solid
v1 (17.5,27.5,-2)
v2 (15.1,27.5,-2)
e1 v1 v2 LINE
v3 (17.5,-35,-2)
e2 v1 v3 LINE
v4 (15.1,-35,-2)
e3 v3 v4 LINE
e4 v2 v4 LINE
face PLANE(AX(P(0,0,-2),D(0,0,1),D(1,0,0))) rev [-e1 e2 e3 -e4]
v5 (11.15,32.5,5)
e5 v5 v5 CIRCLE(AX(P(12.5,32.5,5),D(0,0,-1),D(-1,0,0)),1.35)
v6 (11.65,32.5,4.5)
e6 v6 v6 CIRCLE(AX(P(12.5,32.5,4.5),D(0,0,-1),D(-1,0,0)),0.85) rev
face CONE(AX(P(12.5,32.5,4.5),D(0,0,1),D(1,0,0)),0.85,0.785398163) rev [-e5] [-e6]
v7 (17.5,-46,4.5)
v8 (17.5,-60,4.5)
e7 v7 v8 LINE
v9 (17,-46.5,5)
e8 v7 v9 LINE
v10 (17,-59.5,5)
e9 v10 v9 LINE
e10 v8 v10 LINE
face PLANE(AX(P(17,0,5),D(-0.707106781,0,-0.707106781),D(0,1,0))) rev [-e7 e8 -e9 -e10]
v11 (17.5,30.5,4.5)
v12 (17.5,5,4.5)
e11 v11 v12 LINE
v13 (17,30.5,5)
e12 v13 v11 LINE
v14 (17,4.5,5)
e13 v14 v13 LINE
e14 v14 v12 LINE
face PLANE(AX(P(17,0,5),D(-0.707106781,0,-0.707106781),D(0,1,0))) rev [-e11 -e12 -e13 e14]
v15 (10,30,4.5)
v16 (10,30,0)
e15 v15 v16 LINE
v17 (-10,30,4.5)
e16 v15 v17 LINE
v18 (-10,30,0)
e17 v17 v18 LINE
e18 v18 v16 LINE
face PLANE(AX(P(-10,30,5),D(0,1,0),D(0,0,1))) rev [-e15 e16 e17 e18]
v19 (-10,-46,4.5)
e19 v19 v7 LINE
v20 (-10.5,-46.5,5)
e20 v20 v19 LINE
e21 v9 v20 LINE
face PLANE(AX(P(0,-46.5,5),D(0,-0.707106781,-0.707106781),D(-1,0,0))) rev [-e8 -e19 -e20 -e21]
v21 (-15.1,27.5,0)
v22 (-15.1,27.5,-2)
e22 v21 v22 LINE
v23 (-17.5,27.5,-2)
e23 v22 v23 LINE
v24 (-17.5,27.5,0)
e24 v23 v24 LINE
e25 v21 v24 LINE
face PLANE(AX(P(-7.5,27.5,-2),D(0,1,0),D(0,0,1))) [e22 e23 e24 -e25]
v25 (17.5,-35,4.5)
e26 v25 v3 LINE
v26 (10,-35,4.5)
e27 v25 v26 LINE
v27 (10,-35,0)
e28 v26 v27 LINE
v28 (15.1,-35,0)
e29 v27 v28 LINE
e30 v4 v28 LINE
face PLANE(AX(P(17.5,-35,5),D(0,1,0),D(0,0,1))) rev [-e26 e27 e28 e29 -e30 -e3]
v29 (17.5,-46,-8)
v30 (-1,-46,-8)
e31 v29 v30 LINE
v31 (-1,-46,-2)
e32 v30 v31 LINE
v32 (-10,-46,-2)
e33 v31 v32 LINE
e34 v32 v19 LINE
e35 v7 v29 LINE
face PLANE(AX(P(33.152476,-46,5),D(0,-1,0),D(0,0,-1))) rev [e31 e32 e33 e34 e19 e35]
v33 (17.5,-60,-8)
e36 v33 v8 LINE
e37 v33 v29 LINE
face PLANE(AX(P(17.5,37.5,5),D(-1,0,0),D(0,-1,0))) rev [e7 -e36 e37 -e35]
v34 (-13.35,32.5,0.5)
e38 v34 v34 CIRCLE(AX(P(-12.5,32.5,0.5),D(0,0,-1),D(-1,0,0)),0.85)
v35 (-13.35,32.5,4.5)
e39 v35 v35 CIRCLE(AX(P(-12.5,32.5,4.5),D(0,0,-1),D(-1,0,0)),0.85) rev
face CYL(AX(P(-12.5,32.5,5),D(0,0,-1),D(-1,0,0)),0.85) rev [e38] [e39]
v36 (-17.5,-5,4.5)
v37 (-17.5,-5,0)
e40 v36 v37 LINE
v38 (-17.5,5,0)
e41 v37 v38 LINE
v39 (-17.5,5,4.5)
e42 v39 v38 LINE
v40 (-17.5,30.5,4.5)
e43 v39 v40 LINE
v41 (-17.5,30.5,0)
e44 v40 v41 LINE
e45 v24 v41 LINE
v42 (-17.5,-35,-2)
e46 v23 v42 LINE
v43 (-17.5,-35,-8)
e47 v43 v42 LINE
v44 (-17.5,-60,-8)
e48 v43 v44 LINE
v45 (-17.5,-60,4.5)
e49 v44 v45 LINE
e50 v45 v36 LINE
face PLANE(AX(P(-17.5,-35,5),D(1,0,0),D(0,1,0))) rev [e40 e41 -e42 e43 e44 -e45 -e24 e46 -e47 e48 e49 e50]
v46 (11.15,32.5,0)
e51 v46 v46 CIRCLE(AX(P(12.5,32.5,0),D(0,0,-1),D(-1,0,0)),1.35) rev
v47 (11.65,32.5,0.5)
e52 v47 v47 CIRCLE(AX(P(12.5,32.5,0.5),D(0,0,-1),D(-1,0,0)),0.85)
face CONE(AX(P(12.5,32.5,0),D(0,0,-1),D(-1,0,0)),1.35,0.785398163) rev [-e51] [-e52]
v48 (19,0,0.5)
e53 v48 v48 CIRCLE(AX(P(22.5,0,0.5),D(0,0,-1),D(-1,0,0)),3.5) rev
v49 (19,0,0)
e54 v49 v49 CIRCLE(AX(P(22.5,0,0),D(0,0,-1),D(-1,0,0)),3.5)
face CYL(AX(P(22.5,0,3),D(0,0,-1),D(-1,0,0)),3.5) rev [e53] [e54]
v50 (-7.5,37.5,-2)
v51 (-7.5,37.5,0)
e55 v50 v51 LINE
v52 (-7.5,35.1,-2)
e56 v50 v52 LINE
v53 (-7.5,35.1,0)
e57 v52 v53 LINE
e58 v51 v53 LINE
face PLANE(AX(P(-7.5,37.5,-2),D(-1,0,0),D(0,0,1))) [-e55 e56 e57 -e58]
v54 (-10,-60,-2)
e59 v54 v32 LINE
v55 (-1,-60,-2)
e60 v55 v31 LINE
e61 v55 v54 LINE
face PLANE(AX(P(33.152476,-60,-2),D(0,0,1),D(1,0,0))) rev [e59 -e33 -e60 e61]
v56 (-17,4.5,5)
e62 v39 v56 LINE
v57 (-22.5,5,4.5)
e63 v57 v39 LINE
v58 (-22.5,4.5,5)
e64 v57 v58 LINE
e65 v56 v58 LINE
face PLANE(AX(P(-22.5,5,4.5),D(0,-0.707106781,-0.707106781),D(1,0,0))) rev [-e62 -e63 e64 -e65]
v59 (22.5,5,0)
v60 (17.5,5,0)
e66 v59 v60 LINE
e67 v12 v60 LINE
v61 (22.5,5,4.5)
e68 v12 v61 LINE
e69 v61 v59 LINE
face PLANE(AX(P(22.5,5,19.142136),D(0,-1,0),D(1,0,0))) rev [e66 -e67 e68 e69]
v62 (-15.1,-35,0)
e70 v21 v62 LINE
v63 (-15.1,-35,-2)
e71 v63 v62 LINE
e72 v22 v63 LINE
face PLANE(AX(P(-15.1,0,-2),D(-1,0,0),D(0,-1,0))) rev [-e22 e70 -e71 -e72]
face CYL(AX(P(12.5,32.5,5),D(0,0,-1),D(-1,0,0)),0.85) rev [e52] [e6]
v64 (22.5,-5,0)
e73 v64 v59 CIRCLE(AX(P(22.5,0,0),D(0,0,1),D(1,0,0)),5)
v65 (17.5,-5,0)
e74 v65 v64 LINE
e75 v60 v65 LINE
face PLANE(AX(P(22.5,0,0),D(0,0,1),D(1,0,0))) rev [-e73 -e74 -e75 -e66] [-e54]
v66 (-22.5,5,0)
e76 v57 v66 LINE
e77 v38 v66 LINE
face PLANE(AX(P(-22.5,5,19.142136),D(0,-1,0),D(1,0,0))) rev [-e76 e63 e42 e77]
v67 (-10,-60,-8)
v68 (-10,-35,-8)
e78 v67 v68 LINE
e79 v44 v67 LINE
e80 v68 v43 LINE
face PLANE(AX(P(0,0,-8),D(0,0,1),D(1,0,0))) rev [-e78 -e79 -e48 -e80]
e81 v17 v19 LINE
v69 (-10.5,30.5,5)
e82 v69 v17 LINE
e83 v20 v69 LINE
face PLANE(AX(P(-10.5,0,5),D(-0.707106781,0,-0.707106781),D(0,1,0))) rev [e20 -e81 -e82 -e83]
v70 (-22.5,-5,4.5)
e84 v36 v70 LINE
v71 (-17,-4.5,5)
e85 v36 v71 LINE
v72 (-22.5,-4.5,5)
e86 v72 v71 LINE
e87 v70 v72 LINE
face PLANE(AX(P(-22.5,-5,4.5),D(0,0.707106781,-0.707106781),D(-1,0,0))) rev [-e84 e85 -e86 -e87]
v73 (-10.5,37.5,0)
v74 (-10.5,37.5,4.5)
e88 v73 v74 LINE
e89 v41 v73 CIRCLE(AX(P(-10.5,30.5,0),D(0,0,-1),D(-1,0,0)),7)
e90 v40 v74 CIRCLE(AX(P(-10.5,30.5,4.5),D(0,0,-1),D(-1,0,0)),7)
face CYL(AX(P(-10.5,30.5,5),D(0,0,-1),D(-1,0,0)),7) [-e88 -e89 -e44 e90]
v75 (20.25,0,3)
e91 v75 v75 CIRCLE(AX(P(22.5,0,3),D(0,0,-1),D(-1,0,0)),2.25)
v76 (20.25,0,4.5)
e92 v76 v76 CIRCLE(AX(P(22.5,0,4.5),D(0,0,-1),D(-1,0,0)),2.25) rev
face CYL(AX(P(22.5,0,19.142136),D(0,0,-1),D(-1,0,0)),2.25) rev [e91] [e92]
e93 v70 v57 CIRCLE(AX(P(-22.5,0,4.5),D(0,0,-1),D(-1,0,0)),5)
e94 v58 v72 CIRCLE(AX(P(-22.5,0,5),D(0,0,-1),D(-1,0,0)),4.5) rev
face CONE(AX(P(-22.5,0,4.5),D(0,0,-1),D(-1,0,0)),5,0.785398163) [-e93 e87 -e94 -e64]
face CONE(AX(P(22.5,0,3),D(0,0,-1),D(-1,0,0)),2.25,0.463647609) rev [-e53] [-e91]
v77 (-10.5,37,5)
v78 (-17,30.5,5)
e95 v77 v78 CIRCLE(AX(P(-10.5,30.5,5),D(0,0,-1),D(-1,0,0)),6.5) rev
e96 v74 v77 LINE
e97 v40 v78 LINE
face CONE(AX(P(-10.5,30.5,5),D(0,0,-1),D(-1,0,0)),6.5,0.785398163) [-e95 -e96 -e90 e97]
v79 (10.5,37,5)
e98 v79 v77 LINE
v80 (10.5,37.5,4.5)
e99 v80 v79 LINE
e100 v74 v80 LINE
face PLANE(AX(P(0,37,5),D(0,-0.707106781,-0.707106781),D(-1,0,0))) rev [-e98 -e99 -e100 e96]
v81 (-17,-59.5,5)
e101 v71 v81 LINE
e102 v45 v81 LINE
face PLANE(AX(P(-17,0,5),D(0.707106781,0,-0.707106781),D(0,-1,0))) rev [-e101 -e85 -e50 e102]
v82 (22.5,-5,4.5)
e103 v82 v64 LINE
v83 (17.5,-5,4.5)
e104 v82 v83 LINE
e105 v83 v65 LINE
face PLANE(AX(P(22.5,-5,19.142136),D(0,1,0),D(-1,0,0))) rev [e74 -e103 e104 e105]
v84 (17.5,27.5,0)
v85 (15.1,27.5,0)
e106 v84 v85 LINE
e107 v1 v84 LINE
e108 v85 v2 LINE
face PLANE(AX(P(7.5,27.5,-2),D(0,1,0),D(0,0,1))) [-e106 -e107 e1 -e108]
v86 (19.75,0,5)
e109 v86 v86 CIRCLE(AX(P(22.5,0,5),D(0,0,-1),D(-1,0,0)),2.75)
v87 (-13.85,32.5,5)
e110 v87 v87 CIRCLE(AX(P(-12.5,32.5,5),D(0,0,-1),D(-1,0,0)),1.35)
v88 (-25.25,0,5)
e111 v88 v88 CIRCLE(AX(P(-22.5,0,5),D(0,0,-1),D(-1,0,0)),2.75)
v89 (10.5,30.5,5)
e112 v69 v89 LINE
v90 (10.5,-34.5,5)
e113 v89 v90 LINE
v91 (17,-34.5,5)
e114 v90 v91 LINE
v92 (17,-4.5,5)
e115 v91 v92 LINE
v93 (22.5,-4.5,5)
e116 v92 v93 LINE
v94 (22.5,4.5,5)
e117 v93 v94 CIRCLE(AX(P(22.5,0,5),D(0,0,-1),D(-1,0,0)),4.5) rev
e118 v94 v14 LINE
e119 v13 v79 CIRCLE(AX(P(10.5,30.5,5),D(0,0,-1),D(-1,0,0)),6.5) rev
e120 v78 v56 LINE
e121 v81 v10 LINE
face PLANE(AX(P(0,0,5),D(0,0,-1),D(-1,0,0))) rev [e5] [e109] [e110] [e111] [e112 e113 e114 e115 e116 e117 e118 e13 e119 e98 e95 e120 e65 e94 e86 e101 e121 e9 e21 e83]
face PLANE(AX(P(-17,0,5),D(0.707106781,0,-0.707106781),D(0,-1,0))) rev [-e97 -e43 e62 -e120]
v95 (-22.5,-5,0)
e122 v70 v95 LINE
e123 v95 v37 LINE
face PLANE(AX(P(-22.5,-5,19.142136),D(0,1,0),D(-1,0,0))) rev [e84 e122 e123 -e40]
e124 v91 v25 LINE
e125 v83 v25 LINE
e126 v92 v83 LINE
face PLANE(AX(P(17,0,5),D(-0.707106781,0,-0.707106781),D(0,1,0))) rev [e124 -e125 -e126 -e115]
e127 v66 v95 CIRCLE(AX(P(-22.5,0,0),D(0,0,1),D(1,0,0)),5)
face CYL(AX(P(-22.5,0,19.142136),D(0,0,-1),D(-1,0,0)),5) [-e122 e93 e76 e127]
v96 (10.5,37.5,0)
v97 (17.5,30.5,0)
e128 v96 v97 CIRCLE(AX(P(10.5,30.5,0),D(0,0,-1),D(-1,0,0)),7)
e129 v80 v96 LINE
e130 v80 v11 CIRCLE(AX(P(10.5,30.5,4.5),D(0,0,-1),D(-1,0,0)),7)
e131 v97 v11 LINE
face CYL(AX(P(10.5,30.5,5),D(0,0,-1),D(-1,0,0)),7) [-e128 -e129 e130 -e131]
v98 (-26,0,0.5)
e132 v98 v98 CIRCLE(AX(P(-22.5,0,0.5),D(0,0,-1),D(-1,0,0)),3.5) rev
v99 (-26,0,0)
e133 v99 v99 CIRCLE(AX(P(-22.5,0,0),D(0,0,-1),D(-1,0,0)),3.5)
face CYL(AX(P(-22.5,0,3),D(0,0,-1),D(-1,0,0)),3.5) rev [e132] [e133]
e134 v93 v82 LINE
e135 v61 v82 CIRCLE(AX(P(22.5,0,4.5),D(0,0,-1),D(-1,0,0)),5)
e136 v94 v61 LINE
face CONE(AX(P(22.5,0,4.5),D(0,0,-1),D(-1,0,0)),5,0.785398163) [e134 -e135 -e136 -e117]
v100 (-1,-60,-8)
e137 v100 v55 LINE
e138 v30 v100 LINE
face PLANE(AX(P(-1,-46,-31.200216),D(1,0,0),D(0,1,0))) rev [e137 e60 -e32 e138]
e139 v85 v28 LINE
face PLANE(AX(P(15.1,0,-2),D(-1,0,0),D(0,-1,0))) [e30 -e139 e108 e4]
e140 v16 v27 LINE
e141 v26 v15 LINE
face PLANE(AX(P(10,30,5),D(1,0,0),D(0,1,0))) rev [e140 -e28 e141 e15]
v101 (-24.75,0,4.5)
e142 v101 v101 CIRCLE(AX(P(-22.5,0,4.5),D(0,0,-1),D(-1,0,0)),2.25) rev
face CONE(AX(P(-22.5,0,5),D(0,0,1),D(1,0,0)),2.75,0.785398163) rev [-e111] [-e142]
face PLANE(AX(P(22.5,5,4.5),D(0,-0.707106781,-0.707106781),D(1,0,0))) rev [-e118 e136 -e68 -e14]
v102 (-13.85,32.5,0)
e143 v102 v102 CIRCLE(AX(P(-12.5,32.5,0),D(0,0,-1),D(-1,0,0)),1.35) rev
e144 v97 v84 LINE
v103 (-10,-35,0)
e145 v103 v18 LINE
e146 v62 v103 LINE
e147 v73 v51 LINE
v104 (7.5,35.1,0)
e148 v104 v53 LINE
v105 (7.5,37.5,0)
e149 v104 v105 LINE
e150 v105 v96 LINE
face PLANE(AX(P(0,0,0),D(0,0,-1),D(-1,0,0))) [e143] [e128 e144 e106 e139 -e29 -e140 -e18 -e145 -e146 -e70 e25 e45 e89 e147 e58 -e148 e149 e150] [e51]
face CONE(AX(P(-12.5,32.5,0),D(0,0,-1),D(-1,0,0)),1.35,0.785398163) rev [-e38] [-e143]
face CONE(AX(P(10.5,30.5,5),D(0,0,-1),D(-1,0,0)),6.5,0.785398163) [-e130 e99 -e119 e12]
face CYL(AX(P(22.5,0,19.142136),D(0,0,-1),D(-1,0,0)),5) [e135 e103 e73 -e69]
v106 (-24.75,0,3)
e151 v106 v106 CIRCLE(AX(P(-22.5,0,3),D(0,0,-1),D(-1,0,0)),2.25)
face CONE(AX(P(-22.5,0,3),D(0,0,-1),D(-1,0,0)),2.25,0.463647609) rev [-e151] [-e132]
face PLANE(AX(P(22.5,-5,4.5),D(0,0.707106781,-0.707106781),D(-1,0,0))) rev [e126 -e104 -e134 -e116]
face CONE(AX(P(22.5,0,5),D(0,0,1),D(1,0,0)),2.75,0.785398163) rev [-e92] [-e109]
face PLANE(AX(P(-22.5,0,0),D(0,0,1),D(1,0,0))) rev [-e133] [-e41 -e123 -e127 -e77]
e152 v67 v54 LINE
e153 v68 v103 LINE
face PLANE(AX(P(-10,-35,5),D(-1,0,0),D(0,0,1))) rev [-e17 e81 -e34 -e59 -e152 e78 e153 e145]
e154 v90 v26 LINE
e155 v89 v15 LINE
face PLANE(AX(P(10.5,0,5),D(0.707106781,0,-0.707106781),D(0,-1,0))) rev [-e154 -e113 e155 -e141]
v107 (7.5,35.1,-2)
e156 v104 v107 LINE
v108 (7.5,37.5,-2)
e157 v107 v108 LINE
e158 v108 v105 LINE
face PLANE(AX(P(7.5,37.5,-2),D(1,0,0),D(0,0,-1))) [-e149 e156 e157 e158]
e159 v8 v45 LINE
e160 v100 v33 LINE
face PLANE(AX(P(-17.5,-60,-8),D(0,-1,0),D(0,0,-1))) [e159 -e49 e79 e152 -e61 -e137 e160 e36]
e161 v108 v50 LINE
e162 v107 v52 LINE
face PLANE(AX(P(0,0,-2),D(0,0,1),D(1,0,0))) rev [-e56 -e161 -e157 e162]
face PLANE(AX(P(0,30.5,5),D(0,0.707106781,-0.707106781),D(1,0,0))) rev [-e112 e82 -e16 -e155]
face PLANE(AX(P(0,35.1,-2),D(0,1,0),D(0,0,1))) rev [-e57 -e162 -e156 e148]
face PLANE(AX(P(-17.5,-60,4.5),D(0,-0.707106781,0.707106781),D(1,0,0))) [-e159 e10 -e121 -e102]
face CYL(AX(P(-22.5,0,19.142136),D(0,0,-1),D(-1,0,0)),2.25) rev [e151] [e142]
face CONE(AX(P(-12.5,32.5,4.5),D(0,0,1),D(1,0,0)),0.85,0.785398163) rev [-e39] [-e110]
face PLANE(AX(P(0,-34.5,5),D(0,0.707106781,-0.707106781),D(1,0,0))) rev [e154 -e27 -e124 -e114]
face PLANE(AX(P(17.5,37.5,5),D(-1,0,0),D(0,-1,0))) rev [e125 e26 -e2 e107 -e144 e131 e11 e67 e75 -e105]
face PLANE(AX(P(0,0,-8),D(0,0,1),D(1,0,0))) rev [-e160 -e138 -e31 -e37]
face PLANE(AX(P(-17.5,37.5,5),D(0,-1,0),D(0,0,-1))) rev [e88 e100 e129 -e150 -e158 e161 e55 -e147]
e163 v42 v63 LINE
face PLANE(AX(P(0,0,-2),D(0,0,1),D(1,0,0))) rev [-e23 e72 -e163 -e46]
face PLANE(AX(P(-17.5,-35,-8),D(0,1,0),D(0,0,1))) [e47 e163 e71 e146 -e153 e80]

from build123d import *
from OCP.BRepFilletAPI import BRepFilletAPI_MakeChamfer

# Parameters (mm, degrees)
SKETCH1_R                = 0.85
BOSS_EXTRUDE1_DEPTH      = 5
BOSS_EXTRUDE2_DEPTH      = 2
SKETCH3_R                = 2.25
BOSS_EXTRUDE3_DEPTH      = 5
SKETCH4_R                = 3.5
CUT_EXTRUDE1_DEPTH       = 3
SKETCH5_W                = 10
SKETCH5_H                = 10
CUT_EXTRUDE2_DEPTH       = 47.770717335
FILLET1_R                = 7
BOSS_EXTRUDE4_DEPTH      = 5
BOSS_EXTRUDE4_DEPTH_BACK = 8
SKETCH6_W                = 7.5
SKETCH6_H                = 25
SKETCH7_W                = 7
SKETCH7_H                = 14
BOSS_EXTRUDE5_DEPTH      = 27.5
SKETCH8_W                = 18.5
SKETCH8_H                = 14
BOSS_EXTRUDE6_DEPTH      = 6
CHAMFER3_SIZE            = 0.5
CHAMFER1_SIZE            = 2.5
CHAMFER1_SIZE_2          = 1.25


with BuildPart() as part:
    # Sketch1 → Boss-Extrude1 (new body)
    with BuildSketch(Plane.XY):
        Polygon((-10, -35), (-10, 30), (10, 30), (10, -35), (17.5, -35), (17.5, 37.5), (-17.5, 37.5), (-17.5, -35), align=None)
        with Locations((-12.5, 32.5)):
            Circle(SKETCH1_R, mode=Mode.SUBTRACT)
        with Locations((12.5, 32.5)):
            Circle(SKETCH1_R, mode=Mode.SUBTRACT)
    extrude(amount=BOSS_EXTRUDE1_DEPTH)

    # Sketch2 → Boss-Extrude2 (add)
    with BuildSketch(Plane.XY):
        Polygon((17.5, -35), (17.5, 37.5), (-17.5, 37.5), (-17.5, -35), (-15.1, -35), (-15.1, 35.1), (15.1, 35.1), (15.1, -35), align=None)
    extrude(amount=-BOSS_EXTRUDE2_DEPTH)

    # Sketch3 → Boss-Extrude3 (add)
    # profile 1 of 2: a face of its own
    with BuildSketch(Plane.XY):
        with BuildLine():
            Line((22.5, 5), (17.5, 5))
            Line((17.5, 5), (17.5, -5))
            Line((17.5, -5), (22.5, -5))
            ThreePointArc((22.5, -5), (27.5, 0), (22.5, 5))
        make_face()
        with Locations(Location((22.5, 0, 0), (0, 0, 180))):
            Circle(SKETCH3_R, mode=Mode.SUBTRACT)
    # profile 2 of 2: a face of its own
    with BuildSketch(Plane.XY):
        with BuildLine():
            Line((-22.5, 5), (-17.5, 5))
            Line((-17.5, 5), (-17.5, -5))
            Line((-17.5, -5), (-22.5, -5))
            ThreePointArc((-22.5, -5), (-27.5, 0), (-22.5, 5))
        make_face()
        with Locations(Location((-22.5, 0, 0), (0, 0, 180))):
            Circle(SKETCH3_R, mode=Mode.SUBTRACT)
    extrude(amount=BOSS_EXTRUDE3_DEPTH)

    # Sketch4 → Cut-Extrude1 (cut)
    with BuildSketch(Plane(origin=(0, 0, 0), x_dir=(-1, 0, 0), z_dir=(0, 0, -1))):
        with Locations((-22.5, 0)):
            Circle(SKETCH4_R)
        with Locations((22.5, 0)):
            Circle(SKETCH4_R)
    extrude(amount=-CUT_EXTRUDE1_DEPTH, mode=Mode.SUBTRACT)

    # Sketch5 → Cut-Extrude2 (cut, through all)
    with BuildSketch(Plane(origin=(0, 0, 0), x_dir=(-1, 0, 0), z_dir=(0, 0, -1))):
        with Locations((-12.5, 32.5)):
            Rectangle(SKETCH5_W, SKETCH5_H)
        with Locations((12.5, 32.5)):
            Rectangle(SKETCH5_W, SKETCH5_H)
    extrude(amount=CUT_EXTRUDE2_DEPTH, mode=Mode.SUBTRACT)

    # Fillet1
    fillet1_edges = [part.edges().sort_by_distance(p)[0] for p in [
        (-17.5, 37.5, 2.5),
        (17.5, 37.5, 2.5),
    ]]
    fillet(fillet1_edges, radius=FILLET1_R)

    # Sketch6 → Boss-Extrude4 (add, two sides: drawn at the far end of the back side and taken through both)
    with BuildSketch(Plane.XY.offset(-BOSS_EXTRUDE4_DEPTH_BACK)):
        with Locations((-13.75, -47.5)):
            Rectangle(SKETCH6_W, SKETCH6_H)
    extrude(amount=BOSS_EXTRUDE4_DEPTH + BOSS_EXTRUDE4_DEPTH_BACK)

    # Sketch7 → Boss-Extrude5 (add)
    with BuildSketch(Plane(origin=(-10, 0, 0), x_dir=(0, 0, -1), z_dir=(1, 0, 0))):
        with Locations((-1.5, -53)):
            Rectangle(SKETCH7_W, SKETCH7_H)
    extrude(amount=BOSS_EXTRUDE5_DEPTH)

    # Sketch8 → Boss-Extrude6 (add)
    with BuildSketch(Plane(origin=(0, 0, -2), x_dir=(-1, 0, 0), z_dir=(0, 0, -1))):
        with Locations((-8.25, -53)):
            Rectangle(SKETCH8_W, SKETCH8_H)
    extrude(amount=BOSS_EXTRUDE6_DEPTH)

    # Chamfer3
    chamfer3_edges = [part.edges().sort_by_distance(p)[0] for p in [
        (0, 30, 5),
        (-17.5, -32.5, 5),
        (0, 37.5, 5),
        (15.449747468, 35.449747468, 5),
        (-15.449747468, 35.449747468, 5),
        (0, -60, 5),
        (10, -2.5, 5),
        (-10, -8, 5),
        (17.5, -53, 5),
        (3.75, -46, 5),
        (13.75, -35, 5),
        (-13.35, 32.5, 0),
        (-13.35, 32.5, 5),
        (17.5, -20, 5),
        (11.65, 32.5, 0),
        (11.65, 32.5, 5),
        (27.5, 0, 5),
        (20, 5, 5),
        (20, -5, 5),
        (24.75, 0, 5),
        (-27.5, 0, 5),
        (-20, -5, 5),
        (-20, 5, 5),
        (-20.25, 0, 5),
    ]]
    chamfer(chamfer3_edges, length=CHAMFER3_SIZE)

    # Chamfer1
    chamfer1_edges_1 = [part.edges().sort_by_distance(p)[0] for p in [
        (26, 0, 3),
    ]]
    chamfer1_side_1 = [part.faces().sort_by_distance(p)[0] for p in [
        (26, 0, 2.975),
    ]]
    chamfer1_edges_2 = [part.edges().sort_by_distance(p)[0] for p in [
        (-19, 0, 3),
    ]]
    chamfer1_side_2 = [part.faces().sort_by_distance(p)[0] for p in [
        (-19, 0, 2.975),
    ]]
    chamfer1 = BRepFilletAPI_MakeChamfer(part.part.solid().wrapped)
    for e in chamfer1_edges_1:
        chamfer1.Add(CHAMFER1_SIZE - 0.0001, CHAMFER1_SIZE_2 - 0.0001, e.wrapped, chamfer1_side_1[0].wrapped)
    for e in chamfer1_edges_2:
        chamfer1.Add(CHAMFER1_SIZE - 0.0001, CHAMFER1_SIZE_2 - 0.0001, e.wrapped, chamfer1_side_2[0].wrapped)
    add(Compound.cast(chamfer1.Shape()), mode=Mode.REPLACE)  # a hair under: the kernel refuses the full size


solid = part.part
